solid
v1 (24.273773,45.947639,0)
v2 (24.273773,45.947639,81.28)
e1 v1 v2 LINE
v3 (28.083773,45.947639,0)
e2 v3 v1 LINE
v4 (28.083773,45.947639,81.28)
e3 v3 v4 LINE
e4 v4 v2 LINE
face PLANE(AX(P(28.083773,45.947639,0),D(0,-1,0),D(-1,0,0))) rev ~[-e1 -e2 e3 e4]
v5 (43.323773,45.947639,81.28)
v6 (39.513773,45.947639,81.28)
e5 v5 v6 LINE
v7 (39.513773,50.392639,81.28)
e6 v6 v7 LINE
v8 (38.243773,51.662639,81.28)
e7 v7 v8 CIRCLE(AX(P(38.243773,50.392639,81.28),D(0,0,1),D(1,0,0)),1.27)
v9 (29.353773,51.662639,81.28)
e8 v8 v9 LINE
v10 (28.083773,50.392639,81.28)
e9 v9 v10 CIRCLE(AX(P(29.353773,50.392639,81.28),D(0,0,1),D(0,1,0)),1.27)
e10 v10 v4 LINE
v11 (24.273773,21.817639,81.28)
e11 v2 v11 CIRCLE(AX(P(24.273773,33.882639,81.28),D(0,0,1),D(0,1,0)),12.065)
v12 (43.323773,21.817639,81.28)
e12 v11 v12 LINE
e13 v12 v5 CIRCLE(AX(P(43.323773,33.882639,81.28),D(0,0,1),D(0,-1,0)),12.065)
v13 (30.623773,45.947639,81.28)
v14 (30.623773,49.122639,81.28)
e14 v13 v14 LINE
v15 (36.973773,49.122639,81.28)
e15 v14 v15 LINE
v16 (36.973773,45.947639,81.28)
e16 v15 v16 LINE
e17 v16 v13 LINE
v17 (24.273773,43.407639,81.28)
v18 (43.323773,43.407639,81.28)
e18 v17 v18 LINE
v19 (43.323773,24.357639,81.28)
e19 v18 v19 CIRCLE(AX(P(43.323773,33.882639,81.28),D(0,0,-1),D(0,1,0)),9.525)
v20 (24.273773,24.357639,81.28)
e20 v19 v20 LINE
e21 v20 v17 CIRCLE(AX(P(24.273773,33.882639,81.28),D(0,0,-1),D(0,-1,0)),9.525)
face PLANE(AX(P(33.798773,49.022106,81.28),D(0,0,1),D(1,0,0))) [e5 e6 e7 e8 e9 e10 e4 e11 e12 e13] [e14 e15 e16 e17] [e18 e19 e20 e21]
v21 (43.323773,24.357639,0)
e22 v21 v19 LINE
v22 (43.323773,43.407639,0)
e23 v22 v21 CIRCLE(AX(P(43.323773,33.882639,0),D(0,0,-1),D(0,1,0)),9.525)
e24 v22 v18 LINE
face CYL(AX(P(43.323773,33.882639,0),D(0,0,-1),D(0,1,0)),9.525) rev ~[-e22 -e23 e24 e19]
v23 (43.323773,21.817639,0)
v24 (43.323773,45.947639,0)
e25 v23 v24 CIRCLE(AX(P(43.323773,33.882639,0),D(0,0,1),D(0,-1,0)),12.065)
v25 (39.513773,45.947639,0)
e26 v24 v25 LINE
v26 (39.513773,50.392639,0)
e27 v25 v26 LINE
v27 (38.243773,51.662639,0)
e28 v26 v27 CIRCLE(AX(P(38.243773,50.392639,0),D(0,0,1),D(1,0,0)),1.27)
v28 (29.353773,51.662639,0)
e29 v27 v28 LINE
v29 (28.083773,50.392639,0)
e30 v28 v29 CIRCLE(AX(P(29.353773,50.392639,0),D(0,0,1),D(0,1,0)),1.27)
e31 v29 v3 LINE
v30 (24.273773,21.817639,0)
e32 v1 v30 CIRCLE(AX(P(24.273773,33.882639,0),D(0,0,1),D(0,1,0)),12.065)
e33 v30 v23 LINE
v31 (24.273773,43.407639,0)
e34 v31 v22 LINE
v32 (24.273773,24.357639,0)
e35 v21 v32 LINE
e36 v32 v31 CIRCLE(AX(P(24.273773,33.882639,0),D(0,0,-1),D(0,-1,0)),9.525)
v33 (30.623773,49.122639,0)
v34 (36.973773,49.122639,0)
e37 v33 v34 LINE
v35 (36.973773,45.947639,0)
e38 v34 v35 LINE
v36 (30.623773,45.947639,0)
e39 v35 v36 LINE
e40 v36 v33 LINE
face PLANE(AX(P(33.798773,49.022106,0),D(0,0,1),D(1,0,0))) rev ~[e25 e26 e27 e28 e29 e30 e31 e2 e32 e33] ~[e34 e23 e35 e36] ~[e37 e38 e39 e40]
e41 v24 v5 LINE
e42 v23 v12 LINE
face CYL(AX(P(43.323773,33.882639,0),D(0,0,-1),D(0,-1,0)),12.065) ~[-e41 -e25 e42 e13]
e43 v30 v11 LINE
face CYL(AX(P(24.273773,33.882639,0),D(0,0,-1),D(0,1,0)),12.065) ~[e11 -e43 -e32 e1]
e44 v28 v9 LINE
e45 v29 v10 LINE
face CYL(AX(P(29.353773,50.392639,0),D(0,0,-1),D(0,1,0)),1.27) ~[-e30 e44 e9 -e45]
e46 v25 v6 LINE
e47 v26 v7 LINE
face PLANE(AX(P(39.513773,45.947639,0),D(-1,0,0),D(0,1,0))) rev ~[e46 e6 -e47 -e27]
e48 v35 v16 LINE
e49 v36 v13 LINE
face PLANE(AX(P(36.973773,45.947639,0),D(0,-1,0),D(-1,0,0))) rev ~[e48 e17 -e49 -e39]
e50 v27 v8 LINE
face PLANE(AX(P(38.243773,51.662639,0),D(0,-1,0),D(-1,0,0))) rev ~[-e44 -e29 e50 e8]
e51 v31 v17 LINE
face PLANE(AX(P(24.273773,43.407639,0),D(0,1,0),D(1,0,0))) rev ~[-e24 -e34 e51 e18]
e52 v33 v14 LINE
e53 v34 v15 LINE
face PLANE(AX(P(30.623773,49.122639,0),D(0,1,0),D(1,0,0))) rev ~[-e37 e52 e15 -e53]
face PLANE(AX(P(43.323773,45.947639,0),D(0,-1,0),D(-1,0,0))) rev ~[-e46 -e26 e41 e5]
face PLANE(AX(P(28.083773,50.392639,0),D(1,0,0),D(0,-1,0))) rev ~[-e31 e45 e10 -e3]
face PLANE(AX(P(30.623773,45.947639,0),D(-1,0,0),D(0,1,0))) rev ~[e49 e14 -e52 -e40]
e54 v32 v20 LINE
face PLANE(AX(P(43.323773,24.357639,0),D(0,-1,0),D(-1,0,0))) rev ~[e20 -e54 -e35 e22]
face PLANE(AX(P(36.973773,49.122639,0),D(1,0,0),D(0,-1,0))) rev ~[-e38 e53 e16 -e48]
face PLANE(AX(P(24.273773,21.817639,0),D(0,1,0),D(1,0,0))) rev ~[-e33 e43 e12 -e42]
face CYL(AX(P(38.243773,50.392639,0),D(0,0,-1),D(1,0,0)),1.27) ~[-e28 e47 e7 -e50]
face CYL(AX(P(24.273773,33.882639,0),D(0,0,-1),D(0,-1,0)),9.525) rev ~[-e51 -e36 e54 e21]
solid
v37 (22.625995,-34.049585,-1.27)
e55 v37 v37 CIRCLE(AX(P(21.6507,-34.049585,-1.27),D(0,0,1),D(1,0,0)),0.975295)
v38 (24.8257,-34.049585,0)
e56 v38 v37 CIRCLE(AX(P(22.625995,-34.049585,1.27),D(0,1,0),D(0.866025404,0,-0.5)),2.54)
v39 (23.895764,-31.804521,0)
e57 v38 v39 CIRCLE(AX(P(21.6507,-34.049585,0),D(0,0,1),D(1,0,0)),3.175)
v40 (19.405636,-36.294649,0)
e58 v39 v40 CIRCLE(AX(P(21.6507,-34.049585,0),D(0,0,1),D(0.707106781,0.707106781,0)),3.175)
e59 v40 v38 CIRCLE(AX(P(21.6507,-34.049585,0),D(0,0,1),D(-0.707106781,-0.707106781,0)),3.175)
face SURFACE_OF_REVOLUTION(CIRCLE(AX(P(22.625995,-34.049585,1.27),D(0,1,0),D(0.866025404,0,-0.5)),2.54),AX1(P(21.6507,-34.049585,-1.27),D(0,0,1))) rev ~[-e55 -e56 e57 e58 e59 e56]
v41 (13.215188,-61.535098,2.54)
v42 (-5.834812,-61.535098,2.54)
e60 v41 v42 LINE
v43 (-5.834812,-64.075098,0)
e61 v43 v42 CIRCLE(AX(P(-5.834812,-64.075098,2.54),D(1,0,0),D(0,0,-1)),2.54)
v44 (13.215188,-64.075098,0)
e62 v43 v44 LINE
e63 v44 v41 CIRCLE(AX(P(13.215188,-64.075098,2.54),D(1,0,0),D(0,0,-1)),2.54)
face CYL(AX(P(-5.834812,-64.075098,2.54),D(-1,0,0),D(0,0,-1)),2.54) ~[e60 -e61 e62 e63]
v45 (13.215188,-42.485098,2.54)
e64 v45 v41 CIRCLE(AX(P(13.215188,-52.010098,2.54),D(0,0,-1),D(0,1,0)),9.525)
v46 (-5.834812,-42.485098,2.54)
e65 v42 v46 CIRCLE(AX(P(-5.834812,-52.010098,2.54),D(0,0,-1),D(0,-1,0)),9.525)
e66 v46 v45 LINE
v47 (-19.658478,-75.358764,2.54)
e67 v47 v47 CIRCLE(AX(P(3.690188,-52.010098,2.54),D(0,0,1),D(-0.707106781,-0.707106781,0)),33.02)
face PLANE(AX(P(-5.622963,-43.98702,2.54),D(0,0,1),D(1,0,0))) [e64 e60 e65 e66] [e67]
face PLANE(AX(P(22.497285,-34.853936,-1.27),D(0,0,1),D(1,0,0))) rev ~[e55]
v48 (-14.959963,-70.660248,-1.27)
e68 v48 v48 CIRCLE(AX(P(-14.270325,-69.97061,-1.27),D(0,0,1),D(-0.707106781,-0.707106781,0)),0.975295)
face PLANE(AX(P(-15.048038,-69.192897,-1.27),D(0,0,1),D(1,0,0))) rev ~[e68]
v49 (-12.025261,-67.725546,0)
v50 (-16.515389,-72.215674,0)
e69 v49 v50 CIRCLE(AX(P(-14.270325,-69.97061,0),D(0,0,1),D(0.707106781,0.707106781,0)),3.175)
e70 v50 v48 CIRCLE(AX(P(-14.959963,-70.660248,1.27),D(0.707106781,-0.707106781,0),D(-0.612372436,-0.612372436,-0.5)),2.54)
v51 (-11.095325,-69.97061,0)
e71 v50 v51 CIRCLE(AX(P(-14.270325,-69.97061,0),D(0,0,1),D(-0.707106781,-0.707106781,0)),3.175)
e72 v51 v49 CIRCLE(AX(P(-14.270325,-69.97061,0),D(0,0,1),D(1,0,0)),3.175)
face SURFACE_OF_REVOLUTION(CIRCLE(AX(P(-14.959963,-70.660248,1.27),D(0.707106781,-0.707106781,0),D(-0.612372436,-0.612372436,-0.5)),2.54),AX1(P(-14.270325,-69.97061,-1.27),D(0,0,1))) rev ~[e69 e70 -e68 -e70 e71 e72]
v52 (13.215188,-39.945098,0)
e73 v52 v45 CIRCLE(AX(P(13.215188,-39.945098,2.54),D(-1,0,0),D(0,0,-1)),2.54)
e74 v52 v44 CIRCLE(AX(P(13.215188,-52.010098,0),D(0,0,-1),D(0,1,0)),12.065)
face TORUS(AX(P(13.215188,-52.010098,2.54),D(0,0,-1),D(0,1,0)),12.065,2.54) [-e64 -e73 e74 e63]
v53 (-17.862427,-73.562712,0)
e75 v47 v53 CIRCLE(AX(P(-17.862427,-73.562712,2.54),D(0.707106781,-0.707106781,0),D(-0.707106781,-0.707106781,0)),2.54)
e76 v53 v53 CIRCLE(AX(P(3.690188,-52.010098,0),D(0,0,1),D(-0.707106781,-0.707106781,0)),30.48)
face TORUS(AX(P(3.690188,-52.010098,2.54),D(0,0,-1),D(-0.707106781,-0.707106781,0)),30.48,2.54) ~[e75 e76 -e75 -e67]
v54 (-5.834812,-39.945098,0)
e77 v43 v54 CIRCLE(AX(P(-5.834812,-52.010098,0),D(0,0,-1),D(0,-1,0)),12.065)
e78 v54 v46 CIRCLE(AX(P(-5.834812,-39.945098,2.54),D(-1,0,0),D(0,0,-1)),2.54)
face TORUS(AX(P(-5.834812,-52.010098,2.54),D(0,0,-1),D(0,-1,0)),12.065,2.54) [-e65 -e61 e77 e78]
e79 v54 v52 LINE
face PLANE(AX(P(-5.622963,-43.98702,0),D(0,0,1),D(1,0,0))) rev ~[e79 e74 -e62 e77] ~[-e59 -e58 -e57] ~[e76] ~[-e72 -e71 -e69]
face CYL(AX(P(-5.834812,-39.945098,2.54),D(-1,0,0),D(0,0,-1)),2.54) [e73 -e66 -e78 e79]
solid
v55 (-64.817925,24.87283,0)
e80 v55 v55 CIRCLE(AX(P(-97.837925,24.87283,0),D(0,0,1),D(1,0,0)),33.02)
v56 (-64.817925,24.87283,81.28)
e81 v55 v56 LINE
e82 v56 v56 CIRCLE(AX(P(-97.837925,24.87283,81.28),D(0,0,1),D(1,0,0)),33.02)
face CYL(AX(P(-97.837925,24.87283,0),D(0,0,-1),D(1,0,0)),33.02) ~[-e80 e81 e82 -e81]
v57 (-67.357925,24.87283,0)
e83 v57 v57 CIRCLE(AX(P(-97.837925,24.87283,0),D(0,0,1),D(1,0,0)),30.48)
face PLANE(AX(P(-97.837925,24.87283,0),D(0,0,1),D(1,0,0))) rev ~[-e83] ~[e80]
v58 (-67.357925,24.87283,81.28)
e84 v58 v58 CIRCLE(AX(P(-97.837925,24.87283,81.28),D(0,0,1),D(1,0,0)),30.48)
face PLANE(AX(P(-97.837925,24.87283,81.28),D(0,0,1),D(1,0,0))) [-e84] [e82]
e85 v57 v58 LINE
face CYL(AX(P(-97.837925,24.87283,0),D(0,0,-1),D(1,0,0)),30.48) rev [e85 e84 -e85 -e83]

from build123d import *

# Parameters (mm, degrees)
F0_R         = 33.02
F0_R_2       = 30.48
F1_DEPTH     = 81.28
F2_DEPTH     = 2.54
F3_DEPTH     = 1.27
F4_T1_DEPTH  = 19.05
F4_T8_ANGLE  = 180
F4_T12_ANGLE = 180


# Not quite as in the source:
# - a fillet or chamfer that OpenCascade refuses, or shapes differently, is made with other operations: its cross-section is extruded or revolved along the edge and cut away or added


with BuildPart() as f1:
    # F0 (on Top) → F1 (new body)
    with BuildSketch(Plane.XY):
        with Locations((-97.8379249573, 24.8728301376)):
            Circle(F0_R)
        with Locations((-97.8379249573, 24.8728301376)):
            Circle(F0_R_2, mode=Mode.SUBTRACT)
    extrude(amount=F1_DEPTH)


with BuildPart() as f1b:
    # F0 (on Top) → F1, piece 2 (new body)
    with BuildSketch(Plane.XY):
        with BuildLine():
            Line((36.9737733483, 45.9476387101), (39.5137733483, 45.9476387101))
            Line((39.5137733483, 45.9476387101), (39.5137733483, 50.3926387101))
            ThreePointArc((39.5137733483, 50.3926387101), (39.1417989604, 51.2906643222), (38.2437733483, 51.6626387101))
            Line((38.2437733483, 51.6626387101), (29.3537733483, 51.6626387101))
            ThreePointArc((29.3537733483, 51.6626387101), (28.4557477362, 51.2906643222), (28.0837733483, 50.3926387101))
            Line((28.0837733483, 50.3926387101), (28.0837733483, 45.9476387101))
            Line((28.0837733483, 45.9476387101), (30.6237733483, 45.9476387101))
            Line((30.6237733483, 45.9476387101), (30.6237733483, 49.1226387101))
            Line((30.6237733483, 49.1226387101), (36.9737733483, 49.1226387101))
            Line((36.9737733483, 49.1226387101), (36.9737733483, 45.9476387101))
        make_face()
        with BuildLine():
            ThreePointArc((43.3237733483, 21.8176387101), (55.3887733483, 33.8826387101), (43.3237733483, 45.9476387101))
            Line((43.3237733483, 45.9476387101), (39.5137733483, 45.9476387101))
            Line((39.5137733483, 45.9476387101), (36.9737733483, 45.9476387101))
            Line((36.9737733483, 45.9476387101), (30.6237733483, 45.9476387101))
            Line((30.6237733483, 45.9476387101), (28.0837733483, 45.9476387101))
            Line((28.0837733483, 45.9476387101), (24.2737733483, 45.9476387101))
            ThreePointArc((24.2737733483, 45.9476387101), (12.2087733483, 33.8826387101), (24.2737733483, 21.8176387101))
            Line((24.2737733483, 21.8176387101), (43.3237733483, 21.8176387101))
        make_face()
        with BuildLine():
            ThreePointArc((24.2737733483, 24.3576387101), (14.7487733483, 33.8826387101), (24.2737733483, 43.4076387101))
            Line((24.2737733483, 43.4076387101), (43.3237733483, 43.4076387101))
            ThreePointArc((43.3237733483, 43.4076387101), (52.8487733483, 33.8826387101), (43.3237733483, 24.3576387101))
            Line((43.3237733483, 24.3576387101), (24.2737733483, 24.3576387101))
        make_face(mode=Mode.SUBTRACT)
    extrude(amount=F1_DEPTH)


with BuildPart() as f2:
    # F0 (on Top) → F2 (new body)
    with BuildSketch(Plane.XY):
        with BuildLine():
            Line((23.8957638139, -31.8045213862), (27.0388534563, -28.6614317439))
            ThreePointArc((27.0388534563, -28.6614317439), (-19.6584783733, -28.6614317439), (-19.6584783733, -75.3587635734))
            Line((-19.6584783733, -75.3587635734), (-16.5153887309, -72.215673931))
            ThreePointArc((-16.5153887309, -72.215673931), (-16.5153887309, -67.7255458705), (-12.0252606704, -67.7255458705))
            Line((-12.0252606704, -67.7255458705), (-5.8348124585, -61.5350976586))
            ThreePointArc((-5.8348124585, -61.5350976586), (-15.3598124585, -52.0100976586), (-5.8348124585, -42.4850976586))
            Line((-5.8348124585, -42.4850976586), (13.2151875415, -42.4850976586))
            Line((13.2151875415, -42.4850976586), (19.4056357534, -36.2946494468))
            ThreePointArc((19.4056357534, -36.2946494468), (19.4056357534, -31.8045213862), (23.8957638139, -31.8045213862))
        make_face()
        with BuildLine():
            ThreePointArc((-19.6584783733, -75.3587635734), (16.3263944782, -82.5165998222), (36.7101875415, -52.0100976586))
            ThreePointArc((36.7101875415, -52.0100976586), (34.196689705, -39.3738907219), (27.0388534563, -28.6614317439))
            Line((27.0388534563, -28.6614317439), (23.8957638139, -31.8045213862))
            ThreePointArc((23.8957638139, -31.8045213862), (24.5840172994, -32.8345655187), (24.8256997837, -34.0495854165))
            ThreePointArc((24.8256997837, -34.0495854165), (22.8657196814, -36.9829029322), (19.4056357534, -36.2946494468))
            Line((19.4056357534, -36.2946494468), (13.2151875415, -42.4850976586))
            ThreePointArc((13.2151875415, -42.4850976586), (22.7401875415, -52.0100976586), (13.2151875415, -61.5350976586))
            Line((13.2151875415, -61.5350976586), (-5.8348124585, -61.5350976586))
            Line((-5.8348124585, -61.5350976586), (-12.0252606704, -67.7255458705))
            ThreePointArc((-12.0252606704, -67.7255458705), (-11.3370071849, -68.755590003), (-11.0953247006, -69.9706099008))
            ThreePointArc((-11.0953247006, -69.9706099008), (-13.0553048029, -72.9039274165), (-16.5153887309, -72.215673931))
            Line((-16.5153887309, -72.215673931), (-19.6584783733, -75.3587635734))
        make_face()
        with BuildLine():
            Line((-14.2703247006, -69.9706099008), (-16.5153887309, -72.215673931))
            ThreePointArc((-16.5153887309, -72.215673931), (-13.0553048029, -72.9039274165), (-11.0953247006, -69.9706099008))
            ThreePointArc((-11.0953247006, -69.9706099008), (-11.3370071849, -68.755590003), (-12.0252606704, -67.7255458705))
            Line((-12.0252606704, -67.7255458705), (-14.2703247006, -69.9706099008))
        make_face()
        with BuildLine():
            ThreePointArc((-12.0252606704, -67.7255458705), (-16.5153887309, -67.7255458705), (-16.5153887309, -72.215673931))
            Line((-16.5153887309, -72.215673931), (-14.2703247006, -69.9706099008))
            Line((-14.2703247006, -69.9706099008), (-12.0252606704, -67.7255458705))
        make_face()
        with BuildLine():
            Line((21.6506997837, -34.0495854165), (23.8957638139, -31.8045213862))
            ThreePointArc((23.8957638139, -31.8045213862), (19.4056357534, -31.8045213862), (19.4056357534, -36.2946494468))
            Line((19.4056357534, -36.2946494468), (21.6506997837, -34.0495854165))
        make_face()
        with BuildLine():
            ThreePointArc((24.8256997837, -34.0495854165), (24.5840172994, -32.8345655187), (23.8957638139, -31.8045213862))
            Line((23.8957638139, -31.8045213862), (21.6506997837, -34.0495854165))
            Line((21.6506997837, -34.0495854165), (19.4056357534, -36.2946494468))
            ThreePointArc((19.4056357534, -36.2946494468), (22.8657196814, -36.9829029322), (24.8256997837, -34.0495854165))
        make_face()
    extrude(amount=F2_DEPTH)

    # F0 (on Top) → F3 (join)
    with BuildSketch(Plane.XY):
        with BuildLine():
            ThreePointArc((24.8256997837, -34.0495854165), (24.5840172994, -32.8345655187), (23.8957638139, -31.8045213862))
            Line((23.8957638139, -31.8045213862), (21.6506997837, -34.0495854165))
            Line((21.6506997837, -34.0495854165), (19.4056357534, -36.2946494468))
            ThreePointArc((19.4056357534, -36.2946494468), (22.8657196814, -36.9829029322), (24.8256997837, -34.0495854165))
        make_face()
        with BuildLine():
            Line((21.6506997837, -34.0495854165), (23.8957638139, -31.8045213862))
            ThreePointArc((23.8957638139, -31.8045213862), (19.4056357534, -31.8045213862), (19.4056357534, -36.2946494468))
            Line((19.4056357534, -36.2946494468), (21.6506997837, -34.0495854165))
        make_face()
        with BuildLine():
            ThreePointArc((-12.0252606704, -67.7255458705), (-16.5153887309, -67.7255458705), (-16.5153887309, -72.215673931))
            Line((-16.5153887309, -72.215673931), (-14.2703247006, -69.9706099008))
            Line((-14.2703247006, -69.9706099008), (-12.0252606704, -67.7255458705))
        make_face()
        with BuildLine():
            Line((-14.2703247006, -69.9706099008), (-16.5153887309, -72.215673931))
            ThreePointArc((-16.5153887309, -72.215673931), (-13.0553048029, -72.9039274165), (-11.0953247006, -69.9706099008))
            ThreePointArc((-11.0953247006, -69.9706099008), (-11.3370071849, -68.755590003), (-12.0252606704, -67.7255458705))
            Line((-12.0252606704, -67.7255458705), (-14.2703247006, -69.9706099008))
        make_face()
    extrude(amount=-F3_DEPTH)

    # F4: fillet of radius 2.54 on 7 edges, made by hand

    # F4_s2 → F4_t1 (cut)
    with BuildSketch(Plane.YZ.offset(-5.8348124585)):
        with BuildLine():
            ThreePointArc((-64.0750976586, 0), (-62.2790464344, 0.7439487758), (-61.5350976586, 2.54))
            Line((-61.5350976586, 2.54), (-61.5350976586, 0))
            Line((-61.5350976586, 0), (-64.0750976586, 0))
        make_face()
        with BuildLine():
            ThreePointArc((-39.9450976586, 0), (-41.7411488828, 0.7439487758), (-42.4850976586, 2.54))
            Line((-42.4850976586, 2.54), (-42.4850976586, 0))
            Line((-42.4850976586, 0), (-39.9450976586, 0))
        make_face()
    extrude(amount=F4_T1_DEPTH, mode=Mode.SUBTRACT)

    # F4_s3 → F4_t4 (revolve, cut)
    with BuildSketch(Plane.XZ.offset(34.0495854165)):
        with BuildLine():
            ThreePointArc((24.8256997837, 0), (23.895995258, -0.9297045256), (22.625995258, -1.27))
            Line((22.625995258, -1.27), (24.8256997837, -1.27))
            Line((24.8256997837, -1.27), (24.8256997837, 0))
        make_face()
    revolve(axis=Axis((21.6506997837, -34.0495854165, -1.27), (0, 0, 1)), mode=Mode.SUBTRACT)

    # F4_s5 → F4_t6 (revolve, cut)
    with BuildSketch(Plane(origin=(27.8501426001, -27.8501426001, 0), x_dir=(0, 0, 1), z_dir=(-0.7071067812, 0.7071067812, 0))):
        with BuildLine():
            ThreePointArc((0, -62.7423361101), (-0.9297045256, -61.8126315845), (-1.27, -60.5426315845))
            Line((-1.27, -60.5426315845), (-1.27, -62.7423361101))
            Line((-1.27, -62.7423361101), (0, -62.7423361101))
        make_face()
    revolve(axis=Axis((-14.2703247006, -69.9706099008, -1.27), (0, 0, 1)), mode=Mode.SUBTRACT)

    # F4_s7 → F4_t8 (revolve, cut)
    with BuildSketch(Plane.YZ.offset(13.2151875415)):
        with BuildLine():
            ThreePointArc((-39.9450976586, 0), (-41.7411488828, 0.7439487758), (-42.4850976586, 2.54))
            Line((-42.4850976586, 2.54), (-42.4850976586, 0))
            Line((-42.4850976586, 0), (-39.9450976586, 0))
        make_face()
    revolve(axis=Axis((13.2151875415, -52.0100976586, 0), (0, 0, -1)), revolution_arc=F4_T8_ANGLE, mode=Mode.SUBTRACT)

    # F4_s9 → F4_t10 (revolve, cut)
    with BuildSketch(Plane(origin=(27.8501426001, -27.8501426001, 0), x_dir=(0, 0, 1), z_dir=(-0.7071067812, 0.7071067812, 0))):
        with BuildLine():
            ThreePointArc((2.54, -67.1873361101), (0.7439487758, -66.4433873344), (0, -64.6473361101))
            Line((0, -64.6473361101), (0, -67.1873361101))
            Line((0, -67.1873361101), (2.54, -67.1873361101))
        make_face()
    revolve(axis=Axis((3.6901875415, -52.0100976586, 0), (0, 0, 1)), mode=Mode.SUBTRACT)

    # F4_s11 → F4_t12 (revolve, cut)
    with BuildSketch(Plane.YZ.offset(-5.8348124585)):
        with BuildLine():
            ThreePointArc((-64.0750976586, 0), (-62.2790464344, 0.7439487758), (-61.5350976586, 2.54))
            Line((-61.5350976586, 2.54), (-61.5350976586, 0))
            Line((-61.5350976586, 0), (-64.0750976586, 0))
        make_face()
    revolve(axis=Axis((-5.8348124585, -52.0100976586, 0), (0, 0, -1)), revolution_arc=F4_T12_ANGLE, mode=Mode.SUBTRACT)


solid = Compound([f1.part, f1b.part, f2.part])
